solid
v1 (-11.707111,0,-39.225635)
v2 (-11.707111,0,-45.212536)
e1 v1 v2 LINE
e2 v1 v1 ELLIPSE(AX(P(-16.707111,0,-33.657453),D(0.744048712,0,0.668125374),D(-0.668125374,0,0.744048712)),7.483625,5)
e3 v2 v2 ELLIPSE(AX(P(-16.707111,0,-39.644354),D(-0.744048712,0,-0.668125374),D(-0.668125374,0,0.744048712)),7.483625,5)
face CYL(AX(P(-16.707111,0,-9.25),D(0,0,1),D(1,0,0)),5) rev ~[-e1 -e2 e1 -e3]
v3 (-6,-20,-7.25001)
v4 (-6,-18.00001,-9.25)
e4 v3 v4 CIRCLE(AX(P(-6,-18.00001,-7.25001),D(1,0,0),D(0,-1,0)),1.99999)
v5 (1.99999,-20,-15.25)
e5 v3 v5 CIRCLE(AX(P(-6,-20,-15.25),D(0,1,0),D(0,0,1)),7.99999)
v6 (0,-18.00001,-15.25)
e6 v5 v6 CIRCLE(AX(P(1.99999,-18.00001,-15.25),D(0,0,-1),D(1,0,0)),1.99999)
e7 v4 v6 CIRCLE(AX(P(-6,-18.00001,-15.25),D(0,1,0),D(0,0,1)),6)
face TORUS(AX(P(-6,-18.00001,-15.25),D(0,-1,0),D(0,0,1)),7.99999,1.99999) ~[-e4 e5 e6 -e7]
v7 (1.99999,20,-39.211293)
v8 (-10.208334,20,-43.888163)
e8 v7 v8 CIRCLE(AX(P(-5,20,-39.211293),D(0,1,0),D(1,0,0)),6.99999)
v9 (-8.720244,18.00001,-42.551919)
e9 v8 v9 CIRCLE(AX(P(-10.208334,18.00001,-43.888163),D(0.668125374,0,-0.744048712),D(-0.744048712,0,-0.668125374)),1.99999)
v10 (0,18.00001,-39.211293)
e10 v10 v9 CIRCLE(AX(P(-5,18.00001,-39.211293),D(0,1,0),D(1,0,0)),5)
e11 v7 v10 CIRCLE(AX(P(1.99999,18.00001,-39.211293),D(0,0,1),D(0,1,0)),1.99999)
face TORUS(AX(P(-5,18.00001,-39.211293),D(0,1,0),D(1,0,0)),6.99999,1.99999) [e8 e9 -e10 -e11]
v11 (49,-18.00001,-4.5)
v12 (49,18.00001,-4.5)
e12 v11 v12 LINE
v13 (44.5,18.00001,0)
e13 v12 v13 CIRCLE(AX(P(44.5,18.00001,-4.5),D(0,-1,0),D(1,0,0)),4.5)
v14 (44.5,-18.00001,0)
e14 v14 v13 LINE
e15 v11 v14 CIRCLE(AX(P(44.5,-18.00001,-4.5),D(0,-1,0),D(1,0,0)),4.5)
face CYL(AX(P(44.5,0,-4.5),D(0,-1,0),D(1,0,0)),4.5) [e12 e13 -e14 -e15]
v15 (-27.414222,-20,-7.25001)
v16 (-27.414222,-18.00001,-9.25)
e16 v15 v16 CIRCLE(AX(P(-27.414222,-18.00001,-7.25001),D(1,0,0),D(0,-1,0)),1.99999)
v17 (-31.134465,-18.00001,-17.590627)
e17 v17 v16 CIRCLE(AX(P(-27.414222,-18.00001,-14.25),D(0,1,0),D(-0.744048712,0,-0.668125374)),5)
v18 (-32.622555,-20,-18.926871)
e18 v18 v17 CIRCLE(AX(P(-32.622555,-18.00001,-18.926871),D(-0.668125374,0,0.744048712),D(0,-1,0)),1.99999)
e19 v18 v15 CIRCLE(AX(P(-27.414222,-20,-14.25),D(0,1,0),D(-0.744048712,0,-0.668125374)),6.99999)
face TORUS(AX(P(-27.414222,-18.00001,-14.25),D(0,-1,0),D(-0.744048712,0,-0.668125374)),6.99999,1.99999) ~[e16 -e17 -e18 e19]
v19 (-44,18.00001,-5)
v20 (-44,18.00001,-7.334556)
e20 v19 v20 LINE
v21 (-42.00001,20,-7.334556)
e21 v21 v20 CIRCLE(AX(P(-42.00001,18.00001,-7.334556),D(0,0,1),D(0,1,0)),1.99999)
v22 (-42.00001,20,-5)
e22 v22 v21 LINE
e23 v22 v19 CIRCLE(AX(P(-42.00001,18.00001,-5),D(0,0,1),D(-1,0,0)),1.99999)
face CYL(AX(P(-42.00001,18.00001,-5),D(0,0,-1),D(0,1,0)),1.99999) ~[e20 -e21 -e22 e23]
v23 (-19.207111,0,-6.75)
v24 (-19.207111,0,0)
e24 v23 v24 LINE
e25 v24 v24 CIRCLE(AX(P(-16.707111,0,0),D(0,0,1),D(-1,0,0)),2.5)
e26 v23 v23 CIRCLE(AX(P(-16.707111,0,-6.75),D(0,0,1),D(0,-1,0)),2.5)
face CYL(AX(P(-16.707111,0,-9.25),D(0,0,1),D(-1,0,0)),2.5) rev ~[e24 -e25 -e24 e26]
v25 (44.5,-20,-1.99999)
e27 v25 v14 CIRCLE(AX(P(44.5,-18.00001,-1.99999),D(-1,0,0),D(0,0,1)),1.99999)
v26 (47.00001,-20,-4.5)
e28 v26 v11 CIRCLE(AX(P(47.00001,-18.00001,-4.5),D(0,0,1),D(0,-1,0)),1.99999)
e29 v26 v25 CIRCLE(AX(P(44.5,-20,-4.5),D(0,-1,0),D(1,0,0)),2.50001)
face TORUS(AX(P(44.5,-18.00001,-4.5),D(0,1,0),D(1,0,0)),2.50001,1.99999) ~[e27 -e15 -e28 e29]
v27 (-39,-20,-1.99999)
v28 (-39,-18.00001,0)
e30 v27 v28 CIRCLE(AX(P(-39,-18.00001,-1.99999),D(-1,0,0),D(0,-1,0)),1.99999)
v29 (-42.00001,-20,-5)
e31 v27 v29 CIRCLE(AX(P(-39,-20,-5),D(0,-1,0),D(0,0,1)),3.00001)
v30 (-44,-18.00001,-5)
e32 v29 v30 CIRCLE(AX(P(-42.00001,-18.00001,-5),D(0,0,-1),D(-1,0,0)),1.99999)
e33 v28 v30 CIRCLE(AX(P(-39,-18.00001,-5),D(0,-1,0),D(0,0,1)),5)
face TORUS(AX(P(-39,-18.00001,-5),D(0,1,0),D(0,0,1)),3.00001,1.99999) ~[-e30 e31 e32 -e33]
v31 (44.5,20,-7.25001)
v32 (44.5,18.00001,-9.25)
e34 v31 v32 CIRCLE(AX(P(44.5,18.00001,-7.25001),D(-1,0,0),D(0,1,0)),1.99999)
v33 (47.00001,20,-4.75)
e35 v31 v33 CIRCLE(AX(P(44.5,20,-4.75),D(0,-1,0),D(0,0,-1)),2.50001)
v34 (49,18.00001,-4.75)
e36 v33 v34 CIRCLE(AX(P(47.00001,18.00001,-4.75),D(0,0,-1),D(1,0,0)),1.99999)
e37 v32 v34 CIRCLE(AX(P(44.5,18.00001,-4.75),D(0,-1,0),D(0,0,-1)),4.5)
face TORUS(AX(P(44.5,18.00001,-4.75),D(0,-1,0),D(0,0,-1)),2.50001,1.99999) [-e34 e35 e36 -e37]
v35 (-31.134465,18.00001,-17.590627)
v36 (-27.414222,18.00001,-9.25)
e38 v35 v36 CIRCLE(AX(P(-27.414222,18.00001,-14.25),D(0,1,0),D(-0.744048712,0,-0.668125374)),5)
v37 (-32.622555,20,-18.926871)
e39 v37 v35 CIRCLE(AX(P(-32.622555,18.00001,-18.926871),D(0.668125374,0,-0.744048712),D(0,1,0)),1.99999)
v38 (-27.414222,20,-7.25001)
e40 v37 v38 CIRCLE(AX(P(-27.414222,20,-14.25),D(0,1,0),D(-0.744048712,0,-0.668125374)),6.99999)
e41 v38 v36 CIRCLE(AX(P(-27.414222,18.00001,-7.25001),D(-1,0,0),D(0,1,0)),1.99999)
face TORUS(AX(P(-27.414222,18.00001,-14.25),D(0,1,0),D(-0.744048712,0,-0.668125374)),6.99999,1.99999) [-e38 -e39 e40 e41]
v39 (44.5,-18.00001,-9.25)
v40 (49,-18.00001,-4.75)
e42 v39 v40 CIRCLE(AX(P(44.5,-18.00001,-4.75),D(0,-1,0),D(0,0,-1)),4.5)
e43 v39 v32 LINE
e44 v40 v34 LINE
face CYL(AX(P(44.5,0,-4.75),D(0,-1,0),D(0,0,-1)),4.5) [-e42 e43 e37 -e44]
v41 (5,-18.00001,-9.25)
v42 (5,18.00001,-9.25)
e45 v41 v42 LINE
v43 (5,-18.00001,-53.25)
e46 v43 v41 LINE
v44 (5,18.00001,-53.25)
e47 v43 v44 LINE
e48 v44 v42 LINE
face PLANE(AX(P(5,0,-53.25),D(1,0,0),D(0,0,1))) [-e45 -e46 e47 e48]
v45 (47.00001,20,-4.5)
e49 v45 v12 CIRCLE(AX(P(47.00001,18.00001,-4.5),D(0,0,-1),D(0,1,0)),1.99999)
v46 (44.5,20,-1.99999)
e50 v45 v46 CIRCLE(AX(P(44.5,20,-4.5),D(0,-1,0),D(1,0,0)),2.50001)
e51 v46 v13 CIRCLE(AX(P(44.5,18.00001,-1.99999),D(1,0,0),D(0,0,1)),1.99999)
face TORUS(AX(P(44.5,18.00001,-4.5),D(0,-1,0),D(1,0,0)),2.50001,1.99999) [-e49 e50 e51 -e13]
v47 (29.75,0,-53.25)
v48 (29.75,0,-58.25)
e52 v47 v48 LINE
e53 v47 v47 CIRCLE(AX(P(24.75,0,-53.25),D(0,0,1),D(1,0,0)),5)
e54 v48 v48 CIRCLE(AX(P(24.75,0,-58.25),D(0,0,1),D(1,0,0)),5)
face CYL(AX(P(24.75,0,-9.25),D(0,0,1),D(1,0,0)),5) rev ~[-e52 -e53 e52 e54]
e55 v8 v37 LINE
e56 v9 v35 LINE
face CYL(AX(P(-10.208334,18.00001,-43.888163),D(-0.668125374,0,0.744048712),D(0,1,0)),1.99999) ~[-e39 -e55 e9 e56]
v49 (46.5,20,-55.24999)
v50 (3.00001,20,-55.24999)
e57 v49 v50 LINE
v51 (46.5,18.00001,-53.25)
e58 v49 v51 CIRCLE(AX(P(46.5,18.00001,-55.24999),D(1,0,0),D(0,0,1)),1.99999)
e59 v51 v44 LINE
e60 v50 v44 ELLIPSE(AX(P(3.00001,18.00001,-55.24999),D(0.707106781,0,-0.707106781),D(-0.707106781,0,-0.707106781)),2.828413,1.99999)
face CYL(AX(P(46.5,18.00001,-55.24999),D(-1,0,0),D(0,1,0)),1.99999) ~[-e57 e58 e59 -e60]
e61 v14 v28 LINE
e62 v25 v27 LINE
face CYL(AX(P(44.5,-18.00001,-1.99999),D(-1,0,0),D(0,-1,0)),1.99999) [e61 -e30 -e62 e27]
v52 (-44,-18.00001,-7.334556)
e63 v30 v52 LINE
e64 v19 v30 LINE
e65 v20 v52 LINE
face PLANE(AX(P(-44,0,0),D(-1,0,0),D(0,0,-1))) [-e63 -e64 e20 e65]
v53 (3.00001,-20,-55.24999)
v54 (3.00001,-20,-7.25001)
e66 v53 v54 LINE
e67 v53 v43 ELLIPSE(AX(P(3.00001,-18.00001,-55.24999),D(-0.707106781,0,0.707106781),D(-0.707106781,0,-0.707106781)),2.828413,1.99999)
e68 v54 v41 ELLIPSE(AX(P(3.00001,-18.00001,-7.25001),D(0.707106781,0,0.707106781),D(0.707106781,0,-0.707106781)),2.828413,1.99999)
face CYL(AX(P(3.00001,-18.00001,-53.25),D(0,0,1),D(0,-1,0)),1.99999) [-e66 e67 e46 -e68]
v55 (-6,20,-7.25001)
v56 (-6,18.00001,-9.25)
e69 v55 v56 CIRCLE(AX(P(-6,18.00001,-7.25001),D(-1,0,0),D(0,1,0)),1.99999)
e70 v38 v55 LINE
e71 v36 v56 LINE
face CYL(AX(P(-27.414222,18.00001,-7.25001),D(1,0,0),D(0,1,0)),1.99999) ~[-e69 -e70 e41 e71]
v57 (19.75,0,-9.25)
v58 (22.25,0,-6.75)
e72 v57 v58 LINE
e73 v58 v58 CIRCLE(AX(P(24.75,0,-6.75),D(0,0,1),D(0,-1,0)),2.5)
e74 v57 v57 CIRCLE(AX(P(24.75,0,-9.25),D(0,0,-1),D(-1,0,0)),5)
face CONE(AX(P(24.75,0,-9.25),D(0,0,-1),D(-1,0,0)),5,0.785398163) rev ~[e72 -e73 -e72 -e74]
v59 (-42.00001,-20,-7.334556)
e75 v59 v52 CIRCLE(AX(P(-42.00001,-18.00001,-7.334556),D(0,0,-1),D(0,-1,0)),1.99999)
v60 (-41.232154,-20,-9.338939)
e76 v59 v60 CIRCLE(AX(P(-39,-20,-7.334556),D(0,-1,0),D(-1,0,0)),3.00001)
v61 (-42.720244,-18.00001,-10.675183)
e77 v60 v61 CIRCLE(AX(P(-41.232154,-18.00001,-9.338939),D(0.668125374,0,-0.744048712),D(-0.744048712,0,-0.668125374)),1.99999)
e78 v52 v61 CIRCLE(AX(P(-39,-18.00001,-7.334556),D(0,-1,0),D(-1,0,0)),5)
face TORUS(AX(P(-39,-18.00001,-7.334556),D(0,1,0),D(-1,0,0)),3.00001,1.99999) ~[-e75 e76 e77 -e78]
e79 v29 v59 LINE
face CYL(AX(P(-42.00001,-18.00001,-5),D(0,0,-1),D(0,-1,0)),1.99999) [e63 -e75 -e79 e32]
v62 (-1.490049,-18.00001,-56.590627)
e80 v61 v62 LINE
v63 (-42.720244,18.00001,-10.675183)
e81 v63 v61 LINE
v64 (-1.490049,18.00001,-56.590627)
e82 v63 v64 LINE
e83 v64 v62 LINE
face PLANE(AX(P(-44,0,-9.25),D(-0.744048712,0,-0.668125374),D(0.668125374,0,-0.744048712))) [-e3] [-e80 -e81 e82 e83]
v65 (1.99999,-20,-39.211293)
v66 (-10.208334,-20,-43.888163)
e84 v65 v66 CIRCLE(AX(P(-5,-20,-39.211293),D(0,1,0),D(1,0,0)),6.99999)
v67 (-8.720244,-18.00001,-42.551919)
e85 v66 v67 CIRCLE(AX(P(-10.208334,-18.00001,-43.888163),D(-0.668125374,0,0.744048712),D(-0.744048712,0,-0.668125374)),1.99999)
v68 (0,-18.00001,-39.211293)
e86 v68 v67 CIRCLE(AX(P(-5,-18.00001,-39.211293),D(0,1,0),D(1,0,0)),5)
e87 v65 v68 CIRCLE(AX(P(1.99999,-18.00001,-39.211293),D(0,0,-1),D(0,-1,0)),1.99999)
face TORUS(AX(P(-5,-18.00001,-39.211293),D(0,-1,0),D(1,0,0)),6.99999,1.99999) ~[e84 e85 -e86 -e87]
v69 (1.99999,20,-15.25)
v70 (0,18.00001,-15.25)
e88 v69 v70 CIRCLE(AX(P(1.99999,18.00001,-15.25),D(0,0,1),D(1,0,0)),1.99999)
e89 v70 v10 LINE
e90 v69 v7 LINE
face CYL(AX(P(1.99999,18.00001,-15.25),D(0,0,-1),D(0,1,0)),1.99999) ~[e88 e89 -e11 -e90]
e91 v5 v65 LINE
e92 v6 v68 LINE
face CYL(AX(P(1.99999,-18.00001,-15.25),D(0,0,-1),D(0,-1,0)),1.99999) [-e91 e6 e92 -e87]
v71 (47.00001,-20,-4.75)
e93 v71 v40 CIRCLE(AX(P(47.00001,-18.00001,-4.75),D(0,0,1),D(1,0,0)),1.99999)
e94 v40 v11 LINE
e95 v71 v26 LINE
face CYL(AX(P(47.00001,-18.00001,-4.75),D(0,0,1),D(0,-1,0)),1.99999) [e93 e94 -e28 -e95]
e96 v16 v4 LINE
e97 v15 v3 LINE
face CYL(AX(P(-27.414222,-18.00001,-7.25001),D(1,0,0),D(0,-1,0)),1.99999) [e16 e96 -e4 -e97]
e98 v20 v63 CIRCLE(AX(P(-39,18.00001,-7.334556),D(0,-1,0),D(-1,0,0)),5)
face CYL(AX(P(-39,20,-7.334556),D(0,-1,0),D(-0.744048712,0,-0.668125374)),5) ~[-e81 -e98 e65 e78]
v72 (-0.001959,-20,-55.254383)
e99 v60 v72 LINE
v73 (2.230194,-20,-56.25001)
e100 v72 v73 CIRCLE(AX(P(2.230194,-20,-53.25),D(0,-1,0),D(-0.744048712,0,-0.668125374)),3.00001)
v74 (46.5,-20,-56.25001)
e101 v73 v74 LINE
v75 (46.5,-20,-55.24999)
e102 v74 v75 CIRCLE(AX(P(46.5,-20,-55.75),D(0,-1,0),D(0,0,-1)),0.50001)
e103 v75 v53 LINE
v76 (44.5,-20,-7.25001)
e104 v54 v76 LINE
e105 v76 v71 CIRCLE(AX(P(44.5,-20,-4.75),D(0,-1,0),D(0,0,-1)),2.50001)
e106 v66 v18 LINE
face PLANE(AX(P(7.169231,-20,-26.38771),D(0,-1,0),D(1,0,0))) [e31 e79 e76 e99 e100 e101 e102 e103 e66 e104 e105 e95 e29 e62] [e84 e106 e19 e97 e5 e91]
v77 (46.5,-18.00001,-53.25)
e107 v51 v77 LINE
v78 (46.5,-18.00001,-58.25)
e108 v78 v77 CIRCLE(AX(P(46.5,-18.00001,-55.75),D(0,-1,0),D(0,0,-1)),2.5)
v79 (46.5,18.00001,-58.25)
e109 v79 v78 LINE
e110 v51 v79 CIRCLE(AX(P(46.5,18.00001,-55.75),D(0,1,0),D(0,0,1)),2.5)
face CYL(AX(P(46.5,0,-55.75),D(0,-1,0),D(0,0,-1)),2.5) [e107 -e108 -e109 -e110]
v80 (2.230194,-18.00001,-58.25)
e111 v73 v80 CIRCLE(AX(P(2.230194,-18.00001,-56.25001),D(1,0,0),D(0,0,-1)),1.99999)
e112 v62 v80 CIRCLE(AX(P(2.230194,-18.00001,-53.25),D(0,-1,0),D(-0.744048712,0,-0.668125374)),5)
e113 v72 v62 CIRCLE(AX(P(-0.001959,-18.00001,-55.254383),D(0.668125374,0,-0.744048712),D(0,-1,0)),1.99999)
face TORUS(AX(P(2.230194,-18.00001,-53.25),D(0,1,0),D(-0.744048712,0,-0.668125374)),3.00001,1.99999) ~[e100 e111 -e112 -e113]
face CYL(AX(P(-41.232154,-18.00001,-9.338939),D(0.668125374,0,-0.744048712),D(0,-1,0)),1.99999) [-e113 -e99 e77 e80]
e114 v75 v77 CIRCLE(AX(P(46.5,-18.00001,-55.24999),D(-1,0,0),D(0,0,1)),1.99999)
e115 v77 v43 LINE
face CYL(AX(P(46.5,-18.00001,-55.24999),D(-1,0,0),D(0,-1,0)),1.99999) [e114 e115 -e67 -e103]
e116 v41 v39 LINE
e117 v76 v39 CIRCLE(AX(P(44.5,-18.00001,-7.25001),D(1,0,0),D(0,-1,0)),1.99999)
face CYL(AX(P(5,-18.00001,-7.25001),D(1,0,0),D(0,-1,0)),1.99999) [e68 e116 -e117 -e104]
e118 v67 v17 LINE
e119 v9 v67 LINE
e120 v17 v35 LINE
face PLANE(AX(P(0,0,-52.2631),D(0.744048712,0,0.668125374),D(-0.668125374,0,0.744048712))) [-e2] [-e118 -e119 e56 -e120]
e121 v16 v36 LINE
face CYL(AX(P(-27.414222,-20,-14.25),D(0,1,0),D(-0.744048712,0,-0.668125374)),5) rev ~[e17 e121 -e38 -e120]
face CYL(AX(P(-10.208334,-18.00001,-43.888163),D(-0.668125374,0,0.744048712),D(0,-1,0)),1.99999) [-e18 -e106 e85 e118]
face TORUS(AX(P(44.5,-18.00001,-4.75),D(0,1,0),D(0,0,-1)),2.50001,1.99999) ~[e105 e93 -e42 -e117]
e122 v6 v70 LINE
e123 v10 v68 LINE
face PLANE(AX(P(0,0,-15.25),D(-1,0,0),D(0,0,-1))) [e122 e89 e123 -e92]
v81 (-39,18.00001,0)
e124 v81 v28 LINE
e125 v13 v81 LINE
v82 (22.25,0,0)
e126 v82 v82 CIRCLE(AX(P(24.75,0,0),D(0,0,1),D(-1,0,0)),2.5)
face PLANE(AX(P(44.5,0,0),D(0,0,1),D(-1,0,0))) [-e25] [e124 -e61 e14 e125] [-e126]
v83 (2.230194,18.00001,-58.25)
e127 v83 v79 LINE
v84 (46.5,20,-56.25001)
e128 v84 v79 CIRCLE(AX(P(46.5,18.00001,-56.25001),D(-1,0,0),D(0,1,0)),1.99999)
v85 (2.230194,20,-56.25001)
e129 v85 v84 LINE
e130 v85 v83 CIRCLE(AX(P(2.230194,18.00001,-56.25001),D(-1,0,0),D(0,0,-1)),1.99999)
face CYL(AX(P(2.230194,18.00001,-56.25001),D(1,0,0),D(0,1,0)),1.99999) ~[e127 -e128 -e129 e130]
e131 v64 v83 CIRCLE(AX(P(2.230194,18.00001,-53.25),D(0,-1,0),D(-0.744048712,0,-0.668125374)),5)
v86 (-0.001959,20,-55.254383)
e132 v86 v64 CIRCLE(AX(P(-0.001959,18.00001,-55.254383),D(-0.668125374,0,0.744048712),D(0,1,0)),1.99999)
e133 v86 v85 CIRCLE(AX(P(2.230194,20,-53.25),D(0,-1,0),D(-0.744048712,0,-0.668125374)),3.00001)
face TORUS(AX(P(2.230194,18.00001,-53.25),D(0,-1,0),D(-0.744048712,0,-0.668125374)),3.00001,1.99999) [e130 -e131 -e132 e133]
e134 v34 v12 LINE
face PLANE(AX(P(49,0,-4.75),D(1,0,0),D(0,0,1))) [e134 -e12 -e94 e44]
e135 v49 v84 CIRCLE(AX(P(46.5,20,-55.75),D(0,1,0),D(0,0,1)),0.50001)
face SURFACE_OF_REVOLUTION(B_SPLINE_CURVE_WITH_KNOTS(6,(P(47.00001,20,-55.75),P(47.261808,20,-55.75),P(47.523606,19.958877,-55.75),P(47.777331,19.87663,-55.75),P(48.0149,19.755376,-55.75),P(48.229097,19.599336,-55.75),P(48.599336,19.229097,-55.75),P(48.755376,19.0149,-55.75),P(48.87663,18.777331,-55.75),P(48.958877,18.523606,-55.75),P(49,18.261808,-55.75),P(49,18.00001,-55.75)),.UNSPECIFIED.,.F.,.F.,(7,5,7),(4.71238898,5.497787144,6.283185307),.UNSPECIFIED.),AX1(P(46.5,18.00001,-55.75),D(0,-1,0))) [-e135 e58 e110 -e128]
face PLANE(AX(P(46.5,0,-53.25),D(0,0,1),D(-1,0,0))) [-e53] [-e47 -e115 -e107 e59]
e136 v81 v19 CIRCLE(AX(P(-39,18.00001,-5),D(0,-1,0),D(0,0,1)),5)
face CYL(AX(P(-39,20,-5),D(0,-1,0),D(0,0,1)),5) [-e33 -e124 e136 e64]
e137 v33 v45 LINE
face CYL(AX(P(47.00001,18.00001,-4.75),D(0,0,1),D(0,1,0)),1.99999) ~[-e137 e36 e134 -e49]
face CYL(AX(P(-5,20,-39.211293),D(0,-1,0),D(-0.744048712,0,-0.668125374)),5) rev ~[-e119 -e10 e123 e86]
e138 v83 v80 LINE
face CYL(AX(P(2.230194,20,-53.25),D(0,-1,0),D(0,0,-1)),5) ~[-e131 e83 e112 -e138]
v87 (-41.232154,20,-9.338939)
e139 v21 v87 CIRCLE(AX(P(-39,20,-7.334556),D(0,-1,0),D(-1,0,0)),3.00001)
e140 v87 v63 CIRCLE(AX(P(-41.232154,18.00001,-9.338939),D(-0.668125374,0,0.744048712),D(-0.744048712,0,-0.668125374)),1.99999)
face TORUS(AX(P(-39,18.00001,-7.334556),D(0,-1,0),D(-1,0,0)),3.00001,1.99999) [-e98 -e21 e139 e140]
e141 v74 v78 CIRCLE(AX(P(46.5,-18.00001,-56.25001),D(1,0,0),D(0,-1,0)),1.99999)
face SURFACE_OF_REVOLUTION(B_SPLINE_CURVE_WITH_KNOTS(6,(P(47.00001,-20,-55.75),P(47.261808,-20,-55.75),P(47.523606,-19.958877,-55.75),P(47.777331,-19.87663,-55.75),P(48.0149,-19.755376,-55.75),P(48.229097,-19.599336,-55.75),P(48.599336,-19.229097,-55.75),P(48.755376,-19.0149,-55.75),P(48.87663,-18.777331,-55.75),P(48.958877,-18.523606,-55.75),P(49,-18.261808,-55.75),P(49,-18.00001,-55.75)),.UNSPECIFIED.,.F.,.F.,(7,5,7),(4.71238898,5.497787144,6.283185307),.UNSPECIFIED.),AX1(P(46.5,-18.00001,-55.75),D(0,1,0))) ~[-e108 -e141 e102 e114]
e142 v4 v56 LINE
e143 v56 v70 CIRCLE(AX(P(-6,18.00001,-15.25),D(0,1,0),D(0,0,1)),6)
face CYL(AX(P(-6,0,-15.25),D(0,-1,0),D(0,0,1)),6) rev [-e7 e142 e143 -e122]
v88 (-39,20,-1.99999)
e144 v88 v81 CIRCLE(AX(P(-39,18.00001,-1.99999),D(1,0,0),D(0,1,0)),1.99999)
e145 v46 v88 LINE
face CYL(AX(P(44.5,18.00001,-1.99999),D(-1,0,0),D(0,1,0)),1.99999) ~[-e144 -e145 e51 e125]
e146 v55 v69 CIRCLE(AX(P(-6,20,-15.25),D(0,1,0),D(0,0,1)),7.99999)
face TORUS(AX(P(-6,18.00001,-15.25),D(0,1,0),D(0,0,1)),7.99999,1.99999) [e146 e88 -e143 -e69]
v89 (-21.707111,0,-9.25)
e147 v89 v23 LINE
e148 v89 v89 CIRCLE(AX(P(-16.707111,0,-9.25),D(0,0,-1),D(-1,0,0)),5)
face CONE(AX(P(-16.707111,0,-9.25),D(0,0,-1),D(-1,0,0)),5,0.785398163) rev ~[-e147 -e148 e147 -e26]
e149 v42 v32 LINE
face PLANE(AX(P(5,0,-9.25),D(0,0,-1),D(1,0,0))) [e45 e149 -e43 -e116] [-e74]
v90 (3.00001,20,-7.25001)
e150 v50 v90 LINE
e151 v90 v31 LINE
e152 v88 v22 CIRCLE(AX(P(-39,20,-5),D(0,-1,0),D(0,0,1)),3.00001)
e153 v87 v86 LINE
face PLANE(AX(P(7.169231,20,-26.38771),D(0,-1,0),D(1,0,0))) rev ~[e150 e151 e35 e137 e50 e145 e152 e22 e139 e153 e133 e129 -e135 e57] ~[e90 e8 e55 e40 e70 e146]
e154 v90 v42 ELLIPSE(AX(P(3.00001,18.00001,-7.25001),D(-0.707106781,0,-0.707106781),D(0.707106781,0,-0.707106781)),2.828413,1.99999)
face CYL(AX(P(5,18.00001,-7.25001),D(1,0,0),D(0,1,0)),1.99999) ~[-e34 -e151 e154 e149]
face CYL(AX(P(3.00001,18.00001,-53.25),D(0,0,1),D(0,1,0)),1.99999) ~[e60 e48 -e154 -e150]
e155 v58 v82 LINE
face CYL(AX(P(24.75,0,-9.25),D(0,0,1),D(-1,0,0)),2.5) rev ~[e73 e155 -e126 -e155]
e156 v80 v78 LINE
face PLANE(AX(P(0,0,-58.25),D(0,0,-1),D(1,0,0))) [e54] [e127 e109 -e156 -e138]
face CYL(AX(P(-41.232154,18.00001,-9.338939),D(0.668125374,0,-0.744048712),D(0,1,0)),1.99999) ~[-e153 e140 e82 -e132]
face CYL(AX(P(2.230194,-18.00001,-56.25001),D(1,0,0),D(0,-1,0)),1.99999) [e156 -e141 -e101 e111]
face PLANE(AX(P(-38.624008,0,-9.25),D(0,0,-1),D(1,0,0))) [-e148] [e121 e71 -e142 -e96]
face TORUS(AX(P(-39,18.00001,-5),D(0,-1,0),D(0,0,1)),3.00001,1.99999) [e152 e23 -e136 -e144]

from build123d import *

# Parameters (mm, degrees)
F1_DEPTH             = 20
F2_R                 = 5
F3_R                 = 1.99999
F6_D                 = 5
F6_DEPTH             = 10
F6_CSINK_D           = 10
F6_CSINK_ANGLE       = 90
F6_TIP               = 1.5021515476
F6_ON_F5_D           = 5
F6_ON_F5_DEPTH       = 10
F6_ON_F5_CSINK_D     = 10
F6_ON_F5_CSINK_ANGLE = 90
F6_ON_F5_TIP         = 1.5021515476
F7_D                 = 10
F7_DEPTH             = 49.0010001
F7_ON_F5_D           = 10
F7_ON_F5_DEPTH       = 49.0010001


# Not quite as in the source:
# - a fillet or chamfer is up to 0.001 mm smaller than in the source, because OpenCascade refuses the exact size


with BuildPart() as f1:
    # F0 (on Front) → F1 (new body, symmetric)
    with BuildSketch(Plane.XZ):
        with BuildLine():
            Line((44.5, 0), (-44, 0))
            Line((-44, 0), (-44, -9.25))
            Line((-44, -9.25), (0, -58.25))
            Line((0, -58.25), (46.5, -58.25))
            ThreePointArc((46.5, -58.25), (48.267766953, -57.517766953), (49, -55.75))
            ThreePointArc((49, -55.75), (48.267766953, -53.982233047), (46.5, -53.25))
            Line((46.5, -53.25), (5, -53.25))
            Line((5, -53.25), (5, -9.25))
            Line((5, -9.25), (44.5, -9.25))
            ThreePointArc((44.5, -9.25), (47.6819805153, -7.9319805153), (49, -4.75))
            Line((49, -4.75), (49, -4.5))
            ThreePointArc((49, -4.5), (47.6819805153, -1.3180194847), (44.5, 0))
        make_face()
        with BuildLine():
            Line((0, -52.2630996996), (-38.6240078935, -9.25))
            Line((-38.6240078935, -9.25), (-6, -9.25))
            ThreePointArc((-6, -9.25), (-1.7573593129, -11.0073593129), (0, -15.25))
            Line((0, -15.25), (0, -52.2630996996))
        make_face(mode=Mode.SUBTRACT)
    extrude(amount=F1_DEPTH, both=True)

    # F2
    f2_edges = [f1.edges().sort_by_distance(p)[0] for p in [
        (-44, 0, 0),
        (-44, 0, -9.25),
        (-38.624008, 0, -9.25),
        (0, 0, -52.2631),
        (0, 0, -58.25),
    ]]
    fillet(f2_edges, radius=F2_R)

    # F3 (radius 2 in the source; OpenCascade refuses exactly that, so slightly less here)
    f3_edges = [f1.edges().sort_by_distance(p)[0] for p in [
        (24.75, -20, -9.25),
        (25.75, -20, -53.25),
        (24.75, 20, -9.25),
        (-16.707111, -20, -9.25),
        (5, -20, -31.25),
        (5, 20, -31.25),
        (-16.707111, 20, -9.25),
    ]]
    fillet(f3_edges, radius=F3_R)

    # F6
    with Locations(Plane(origin=(0, 0, -9.25), x_dir=(1, 0, 0), z_dir=(0, 0, -1))):
        with Locations((24.75, 0)):
            CounterSinkHole(F6_D / 2, F6_CSINK_D / 2, depth=F6_DEPTH, counter_sink_angle=F6_CSINK_ANGLE)
            with Locations((0, 0, -(F6_DEPTH + F6_TIP / 2))):  # 118° drill point
                Cone(0, F6_D / 2, F6_TIP, mode=Mode.SUBTRACT)

    # F6 on F5
    with Locations(Plane(origin=(0, 0, -9.25), x_dir=(1, 0, 0), z_dir=(0, 0, -1))):
        with Locations((-16.7071109211, 0)):
            CounterSinkHole(F6_ON_F5_D / 2, F6_ON_F5_CSINK_D / 2, depth=F6_ON_F5_DEPTH, counter_sink_angle=F6_ON_F5_CSINK_ANGLE)
            with Locations((0, 0, -(F6_ON_F5_DEPTH + F6_ON_F5_TIP / 2))):  # 118° drill point
                Cone(0, F6_ON_F5_D / 2, F6_ON_F5_TIP, mode=Mode.SUBTRACT)

    # F7 (through all, one way)
    with BuildSketch(Plane.XY.offset(-9.25)):
        with Locations((24.75, 0)):
            Circle(F7_D / 2)
    extrude(amount=-F7_DEPTH, mode=Mode.SUBTRACT)

    # F7 on F5 (through all, one way)
    with BuildSketch(Plane.XY.offset(-9.25)):
        with Locations((-16.7071109211, 0)):
            Circle(F7_ON_F5_D / 2)
    extrude(amount=-F7_ON_F5_DEPTH, mode=Mode.SUBTRACT)


solid = f1.part
